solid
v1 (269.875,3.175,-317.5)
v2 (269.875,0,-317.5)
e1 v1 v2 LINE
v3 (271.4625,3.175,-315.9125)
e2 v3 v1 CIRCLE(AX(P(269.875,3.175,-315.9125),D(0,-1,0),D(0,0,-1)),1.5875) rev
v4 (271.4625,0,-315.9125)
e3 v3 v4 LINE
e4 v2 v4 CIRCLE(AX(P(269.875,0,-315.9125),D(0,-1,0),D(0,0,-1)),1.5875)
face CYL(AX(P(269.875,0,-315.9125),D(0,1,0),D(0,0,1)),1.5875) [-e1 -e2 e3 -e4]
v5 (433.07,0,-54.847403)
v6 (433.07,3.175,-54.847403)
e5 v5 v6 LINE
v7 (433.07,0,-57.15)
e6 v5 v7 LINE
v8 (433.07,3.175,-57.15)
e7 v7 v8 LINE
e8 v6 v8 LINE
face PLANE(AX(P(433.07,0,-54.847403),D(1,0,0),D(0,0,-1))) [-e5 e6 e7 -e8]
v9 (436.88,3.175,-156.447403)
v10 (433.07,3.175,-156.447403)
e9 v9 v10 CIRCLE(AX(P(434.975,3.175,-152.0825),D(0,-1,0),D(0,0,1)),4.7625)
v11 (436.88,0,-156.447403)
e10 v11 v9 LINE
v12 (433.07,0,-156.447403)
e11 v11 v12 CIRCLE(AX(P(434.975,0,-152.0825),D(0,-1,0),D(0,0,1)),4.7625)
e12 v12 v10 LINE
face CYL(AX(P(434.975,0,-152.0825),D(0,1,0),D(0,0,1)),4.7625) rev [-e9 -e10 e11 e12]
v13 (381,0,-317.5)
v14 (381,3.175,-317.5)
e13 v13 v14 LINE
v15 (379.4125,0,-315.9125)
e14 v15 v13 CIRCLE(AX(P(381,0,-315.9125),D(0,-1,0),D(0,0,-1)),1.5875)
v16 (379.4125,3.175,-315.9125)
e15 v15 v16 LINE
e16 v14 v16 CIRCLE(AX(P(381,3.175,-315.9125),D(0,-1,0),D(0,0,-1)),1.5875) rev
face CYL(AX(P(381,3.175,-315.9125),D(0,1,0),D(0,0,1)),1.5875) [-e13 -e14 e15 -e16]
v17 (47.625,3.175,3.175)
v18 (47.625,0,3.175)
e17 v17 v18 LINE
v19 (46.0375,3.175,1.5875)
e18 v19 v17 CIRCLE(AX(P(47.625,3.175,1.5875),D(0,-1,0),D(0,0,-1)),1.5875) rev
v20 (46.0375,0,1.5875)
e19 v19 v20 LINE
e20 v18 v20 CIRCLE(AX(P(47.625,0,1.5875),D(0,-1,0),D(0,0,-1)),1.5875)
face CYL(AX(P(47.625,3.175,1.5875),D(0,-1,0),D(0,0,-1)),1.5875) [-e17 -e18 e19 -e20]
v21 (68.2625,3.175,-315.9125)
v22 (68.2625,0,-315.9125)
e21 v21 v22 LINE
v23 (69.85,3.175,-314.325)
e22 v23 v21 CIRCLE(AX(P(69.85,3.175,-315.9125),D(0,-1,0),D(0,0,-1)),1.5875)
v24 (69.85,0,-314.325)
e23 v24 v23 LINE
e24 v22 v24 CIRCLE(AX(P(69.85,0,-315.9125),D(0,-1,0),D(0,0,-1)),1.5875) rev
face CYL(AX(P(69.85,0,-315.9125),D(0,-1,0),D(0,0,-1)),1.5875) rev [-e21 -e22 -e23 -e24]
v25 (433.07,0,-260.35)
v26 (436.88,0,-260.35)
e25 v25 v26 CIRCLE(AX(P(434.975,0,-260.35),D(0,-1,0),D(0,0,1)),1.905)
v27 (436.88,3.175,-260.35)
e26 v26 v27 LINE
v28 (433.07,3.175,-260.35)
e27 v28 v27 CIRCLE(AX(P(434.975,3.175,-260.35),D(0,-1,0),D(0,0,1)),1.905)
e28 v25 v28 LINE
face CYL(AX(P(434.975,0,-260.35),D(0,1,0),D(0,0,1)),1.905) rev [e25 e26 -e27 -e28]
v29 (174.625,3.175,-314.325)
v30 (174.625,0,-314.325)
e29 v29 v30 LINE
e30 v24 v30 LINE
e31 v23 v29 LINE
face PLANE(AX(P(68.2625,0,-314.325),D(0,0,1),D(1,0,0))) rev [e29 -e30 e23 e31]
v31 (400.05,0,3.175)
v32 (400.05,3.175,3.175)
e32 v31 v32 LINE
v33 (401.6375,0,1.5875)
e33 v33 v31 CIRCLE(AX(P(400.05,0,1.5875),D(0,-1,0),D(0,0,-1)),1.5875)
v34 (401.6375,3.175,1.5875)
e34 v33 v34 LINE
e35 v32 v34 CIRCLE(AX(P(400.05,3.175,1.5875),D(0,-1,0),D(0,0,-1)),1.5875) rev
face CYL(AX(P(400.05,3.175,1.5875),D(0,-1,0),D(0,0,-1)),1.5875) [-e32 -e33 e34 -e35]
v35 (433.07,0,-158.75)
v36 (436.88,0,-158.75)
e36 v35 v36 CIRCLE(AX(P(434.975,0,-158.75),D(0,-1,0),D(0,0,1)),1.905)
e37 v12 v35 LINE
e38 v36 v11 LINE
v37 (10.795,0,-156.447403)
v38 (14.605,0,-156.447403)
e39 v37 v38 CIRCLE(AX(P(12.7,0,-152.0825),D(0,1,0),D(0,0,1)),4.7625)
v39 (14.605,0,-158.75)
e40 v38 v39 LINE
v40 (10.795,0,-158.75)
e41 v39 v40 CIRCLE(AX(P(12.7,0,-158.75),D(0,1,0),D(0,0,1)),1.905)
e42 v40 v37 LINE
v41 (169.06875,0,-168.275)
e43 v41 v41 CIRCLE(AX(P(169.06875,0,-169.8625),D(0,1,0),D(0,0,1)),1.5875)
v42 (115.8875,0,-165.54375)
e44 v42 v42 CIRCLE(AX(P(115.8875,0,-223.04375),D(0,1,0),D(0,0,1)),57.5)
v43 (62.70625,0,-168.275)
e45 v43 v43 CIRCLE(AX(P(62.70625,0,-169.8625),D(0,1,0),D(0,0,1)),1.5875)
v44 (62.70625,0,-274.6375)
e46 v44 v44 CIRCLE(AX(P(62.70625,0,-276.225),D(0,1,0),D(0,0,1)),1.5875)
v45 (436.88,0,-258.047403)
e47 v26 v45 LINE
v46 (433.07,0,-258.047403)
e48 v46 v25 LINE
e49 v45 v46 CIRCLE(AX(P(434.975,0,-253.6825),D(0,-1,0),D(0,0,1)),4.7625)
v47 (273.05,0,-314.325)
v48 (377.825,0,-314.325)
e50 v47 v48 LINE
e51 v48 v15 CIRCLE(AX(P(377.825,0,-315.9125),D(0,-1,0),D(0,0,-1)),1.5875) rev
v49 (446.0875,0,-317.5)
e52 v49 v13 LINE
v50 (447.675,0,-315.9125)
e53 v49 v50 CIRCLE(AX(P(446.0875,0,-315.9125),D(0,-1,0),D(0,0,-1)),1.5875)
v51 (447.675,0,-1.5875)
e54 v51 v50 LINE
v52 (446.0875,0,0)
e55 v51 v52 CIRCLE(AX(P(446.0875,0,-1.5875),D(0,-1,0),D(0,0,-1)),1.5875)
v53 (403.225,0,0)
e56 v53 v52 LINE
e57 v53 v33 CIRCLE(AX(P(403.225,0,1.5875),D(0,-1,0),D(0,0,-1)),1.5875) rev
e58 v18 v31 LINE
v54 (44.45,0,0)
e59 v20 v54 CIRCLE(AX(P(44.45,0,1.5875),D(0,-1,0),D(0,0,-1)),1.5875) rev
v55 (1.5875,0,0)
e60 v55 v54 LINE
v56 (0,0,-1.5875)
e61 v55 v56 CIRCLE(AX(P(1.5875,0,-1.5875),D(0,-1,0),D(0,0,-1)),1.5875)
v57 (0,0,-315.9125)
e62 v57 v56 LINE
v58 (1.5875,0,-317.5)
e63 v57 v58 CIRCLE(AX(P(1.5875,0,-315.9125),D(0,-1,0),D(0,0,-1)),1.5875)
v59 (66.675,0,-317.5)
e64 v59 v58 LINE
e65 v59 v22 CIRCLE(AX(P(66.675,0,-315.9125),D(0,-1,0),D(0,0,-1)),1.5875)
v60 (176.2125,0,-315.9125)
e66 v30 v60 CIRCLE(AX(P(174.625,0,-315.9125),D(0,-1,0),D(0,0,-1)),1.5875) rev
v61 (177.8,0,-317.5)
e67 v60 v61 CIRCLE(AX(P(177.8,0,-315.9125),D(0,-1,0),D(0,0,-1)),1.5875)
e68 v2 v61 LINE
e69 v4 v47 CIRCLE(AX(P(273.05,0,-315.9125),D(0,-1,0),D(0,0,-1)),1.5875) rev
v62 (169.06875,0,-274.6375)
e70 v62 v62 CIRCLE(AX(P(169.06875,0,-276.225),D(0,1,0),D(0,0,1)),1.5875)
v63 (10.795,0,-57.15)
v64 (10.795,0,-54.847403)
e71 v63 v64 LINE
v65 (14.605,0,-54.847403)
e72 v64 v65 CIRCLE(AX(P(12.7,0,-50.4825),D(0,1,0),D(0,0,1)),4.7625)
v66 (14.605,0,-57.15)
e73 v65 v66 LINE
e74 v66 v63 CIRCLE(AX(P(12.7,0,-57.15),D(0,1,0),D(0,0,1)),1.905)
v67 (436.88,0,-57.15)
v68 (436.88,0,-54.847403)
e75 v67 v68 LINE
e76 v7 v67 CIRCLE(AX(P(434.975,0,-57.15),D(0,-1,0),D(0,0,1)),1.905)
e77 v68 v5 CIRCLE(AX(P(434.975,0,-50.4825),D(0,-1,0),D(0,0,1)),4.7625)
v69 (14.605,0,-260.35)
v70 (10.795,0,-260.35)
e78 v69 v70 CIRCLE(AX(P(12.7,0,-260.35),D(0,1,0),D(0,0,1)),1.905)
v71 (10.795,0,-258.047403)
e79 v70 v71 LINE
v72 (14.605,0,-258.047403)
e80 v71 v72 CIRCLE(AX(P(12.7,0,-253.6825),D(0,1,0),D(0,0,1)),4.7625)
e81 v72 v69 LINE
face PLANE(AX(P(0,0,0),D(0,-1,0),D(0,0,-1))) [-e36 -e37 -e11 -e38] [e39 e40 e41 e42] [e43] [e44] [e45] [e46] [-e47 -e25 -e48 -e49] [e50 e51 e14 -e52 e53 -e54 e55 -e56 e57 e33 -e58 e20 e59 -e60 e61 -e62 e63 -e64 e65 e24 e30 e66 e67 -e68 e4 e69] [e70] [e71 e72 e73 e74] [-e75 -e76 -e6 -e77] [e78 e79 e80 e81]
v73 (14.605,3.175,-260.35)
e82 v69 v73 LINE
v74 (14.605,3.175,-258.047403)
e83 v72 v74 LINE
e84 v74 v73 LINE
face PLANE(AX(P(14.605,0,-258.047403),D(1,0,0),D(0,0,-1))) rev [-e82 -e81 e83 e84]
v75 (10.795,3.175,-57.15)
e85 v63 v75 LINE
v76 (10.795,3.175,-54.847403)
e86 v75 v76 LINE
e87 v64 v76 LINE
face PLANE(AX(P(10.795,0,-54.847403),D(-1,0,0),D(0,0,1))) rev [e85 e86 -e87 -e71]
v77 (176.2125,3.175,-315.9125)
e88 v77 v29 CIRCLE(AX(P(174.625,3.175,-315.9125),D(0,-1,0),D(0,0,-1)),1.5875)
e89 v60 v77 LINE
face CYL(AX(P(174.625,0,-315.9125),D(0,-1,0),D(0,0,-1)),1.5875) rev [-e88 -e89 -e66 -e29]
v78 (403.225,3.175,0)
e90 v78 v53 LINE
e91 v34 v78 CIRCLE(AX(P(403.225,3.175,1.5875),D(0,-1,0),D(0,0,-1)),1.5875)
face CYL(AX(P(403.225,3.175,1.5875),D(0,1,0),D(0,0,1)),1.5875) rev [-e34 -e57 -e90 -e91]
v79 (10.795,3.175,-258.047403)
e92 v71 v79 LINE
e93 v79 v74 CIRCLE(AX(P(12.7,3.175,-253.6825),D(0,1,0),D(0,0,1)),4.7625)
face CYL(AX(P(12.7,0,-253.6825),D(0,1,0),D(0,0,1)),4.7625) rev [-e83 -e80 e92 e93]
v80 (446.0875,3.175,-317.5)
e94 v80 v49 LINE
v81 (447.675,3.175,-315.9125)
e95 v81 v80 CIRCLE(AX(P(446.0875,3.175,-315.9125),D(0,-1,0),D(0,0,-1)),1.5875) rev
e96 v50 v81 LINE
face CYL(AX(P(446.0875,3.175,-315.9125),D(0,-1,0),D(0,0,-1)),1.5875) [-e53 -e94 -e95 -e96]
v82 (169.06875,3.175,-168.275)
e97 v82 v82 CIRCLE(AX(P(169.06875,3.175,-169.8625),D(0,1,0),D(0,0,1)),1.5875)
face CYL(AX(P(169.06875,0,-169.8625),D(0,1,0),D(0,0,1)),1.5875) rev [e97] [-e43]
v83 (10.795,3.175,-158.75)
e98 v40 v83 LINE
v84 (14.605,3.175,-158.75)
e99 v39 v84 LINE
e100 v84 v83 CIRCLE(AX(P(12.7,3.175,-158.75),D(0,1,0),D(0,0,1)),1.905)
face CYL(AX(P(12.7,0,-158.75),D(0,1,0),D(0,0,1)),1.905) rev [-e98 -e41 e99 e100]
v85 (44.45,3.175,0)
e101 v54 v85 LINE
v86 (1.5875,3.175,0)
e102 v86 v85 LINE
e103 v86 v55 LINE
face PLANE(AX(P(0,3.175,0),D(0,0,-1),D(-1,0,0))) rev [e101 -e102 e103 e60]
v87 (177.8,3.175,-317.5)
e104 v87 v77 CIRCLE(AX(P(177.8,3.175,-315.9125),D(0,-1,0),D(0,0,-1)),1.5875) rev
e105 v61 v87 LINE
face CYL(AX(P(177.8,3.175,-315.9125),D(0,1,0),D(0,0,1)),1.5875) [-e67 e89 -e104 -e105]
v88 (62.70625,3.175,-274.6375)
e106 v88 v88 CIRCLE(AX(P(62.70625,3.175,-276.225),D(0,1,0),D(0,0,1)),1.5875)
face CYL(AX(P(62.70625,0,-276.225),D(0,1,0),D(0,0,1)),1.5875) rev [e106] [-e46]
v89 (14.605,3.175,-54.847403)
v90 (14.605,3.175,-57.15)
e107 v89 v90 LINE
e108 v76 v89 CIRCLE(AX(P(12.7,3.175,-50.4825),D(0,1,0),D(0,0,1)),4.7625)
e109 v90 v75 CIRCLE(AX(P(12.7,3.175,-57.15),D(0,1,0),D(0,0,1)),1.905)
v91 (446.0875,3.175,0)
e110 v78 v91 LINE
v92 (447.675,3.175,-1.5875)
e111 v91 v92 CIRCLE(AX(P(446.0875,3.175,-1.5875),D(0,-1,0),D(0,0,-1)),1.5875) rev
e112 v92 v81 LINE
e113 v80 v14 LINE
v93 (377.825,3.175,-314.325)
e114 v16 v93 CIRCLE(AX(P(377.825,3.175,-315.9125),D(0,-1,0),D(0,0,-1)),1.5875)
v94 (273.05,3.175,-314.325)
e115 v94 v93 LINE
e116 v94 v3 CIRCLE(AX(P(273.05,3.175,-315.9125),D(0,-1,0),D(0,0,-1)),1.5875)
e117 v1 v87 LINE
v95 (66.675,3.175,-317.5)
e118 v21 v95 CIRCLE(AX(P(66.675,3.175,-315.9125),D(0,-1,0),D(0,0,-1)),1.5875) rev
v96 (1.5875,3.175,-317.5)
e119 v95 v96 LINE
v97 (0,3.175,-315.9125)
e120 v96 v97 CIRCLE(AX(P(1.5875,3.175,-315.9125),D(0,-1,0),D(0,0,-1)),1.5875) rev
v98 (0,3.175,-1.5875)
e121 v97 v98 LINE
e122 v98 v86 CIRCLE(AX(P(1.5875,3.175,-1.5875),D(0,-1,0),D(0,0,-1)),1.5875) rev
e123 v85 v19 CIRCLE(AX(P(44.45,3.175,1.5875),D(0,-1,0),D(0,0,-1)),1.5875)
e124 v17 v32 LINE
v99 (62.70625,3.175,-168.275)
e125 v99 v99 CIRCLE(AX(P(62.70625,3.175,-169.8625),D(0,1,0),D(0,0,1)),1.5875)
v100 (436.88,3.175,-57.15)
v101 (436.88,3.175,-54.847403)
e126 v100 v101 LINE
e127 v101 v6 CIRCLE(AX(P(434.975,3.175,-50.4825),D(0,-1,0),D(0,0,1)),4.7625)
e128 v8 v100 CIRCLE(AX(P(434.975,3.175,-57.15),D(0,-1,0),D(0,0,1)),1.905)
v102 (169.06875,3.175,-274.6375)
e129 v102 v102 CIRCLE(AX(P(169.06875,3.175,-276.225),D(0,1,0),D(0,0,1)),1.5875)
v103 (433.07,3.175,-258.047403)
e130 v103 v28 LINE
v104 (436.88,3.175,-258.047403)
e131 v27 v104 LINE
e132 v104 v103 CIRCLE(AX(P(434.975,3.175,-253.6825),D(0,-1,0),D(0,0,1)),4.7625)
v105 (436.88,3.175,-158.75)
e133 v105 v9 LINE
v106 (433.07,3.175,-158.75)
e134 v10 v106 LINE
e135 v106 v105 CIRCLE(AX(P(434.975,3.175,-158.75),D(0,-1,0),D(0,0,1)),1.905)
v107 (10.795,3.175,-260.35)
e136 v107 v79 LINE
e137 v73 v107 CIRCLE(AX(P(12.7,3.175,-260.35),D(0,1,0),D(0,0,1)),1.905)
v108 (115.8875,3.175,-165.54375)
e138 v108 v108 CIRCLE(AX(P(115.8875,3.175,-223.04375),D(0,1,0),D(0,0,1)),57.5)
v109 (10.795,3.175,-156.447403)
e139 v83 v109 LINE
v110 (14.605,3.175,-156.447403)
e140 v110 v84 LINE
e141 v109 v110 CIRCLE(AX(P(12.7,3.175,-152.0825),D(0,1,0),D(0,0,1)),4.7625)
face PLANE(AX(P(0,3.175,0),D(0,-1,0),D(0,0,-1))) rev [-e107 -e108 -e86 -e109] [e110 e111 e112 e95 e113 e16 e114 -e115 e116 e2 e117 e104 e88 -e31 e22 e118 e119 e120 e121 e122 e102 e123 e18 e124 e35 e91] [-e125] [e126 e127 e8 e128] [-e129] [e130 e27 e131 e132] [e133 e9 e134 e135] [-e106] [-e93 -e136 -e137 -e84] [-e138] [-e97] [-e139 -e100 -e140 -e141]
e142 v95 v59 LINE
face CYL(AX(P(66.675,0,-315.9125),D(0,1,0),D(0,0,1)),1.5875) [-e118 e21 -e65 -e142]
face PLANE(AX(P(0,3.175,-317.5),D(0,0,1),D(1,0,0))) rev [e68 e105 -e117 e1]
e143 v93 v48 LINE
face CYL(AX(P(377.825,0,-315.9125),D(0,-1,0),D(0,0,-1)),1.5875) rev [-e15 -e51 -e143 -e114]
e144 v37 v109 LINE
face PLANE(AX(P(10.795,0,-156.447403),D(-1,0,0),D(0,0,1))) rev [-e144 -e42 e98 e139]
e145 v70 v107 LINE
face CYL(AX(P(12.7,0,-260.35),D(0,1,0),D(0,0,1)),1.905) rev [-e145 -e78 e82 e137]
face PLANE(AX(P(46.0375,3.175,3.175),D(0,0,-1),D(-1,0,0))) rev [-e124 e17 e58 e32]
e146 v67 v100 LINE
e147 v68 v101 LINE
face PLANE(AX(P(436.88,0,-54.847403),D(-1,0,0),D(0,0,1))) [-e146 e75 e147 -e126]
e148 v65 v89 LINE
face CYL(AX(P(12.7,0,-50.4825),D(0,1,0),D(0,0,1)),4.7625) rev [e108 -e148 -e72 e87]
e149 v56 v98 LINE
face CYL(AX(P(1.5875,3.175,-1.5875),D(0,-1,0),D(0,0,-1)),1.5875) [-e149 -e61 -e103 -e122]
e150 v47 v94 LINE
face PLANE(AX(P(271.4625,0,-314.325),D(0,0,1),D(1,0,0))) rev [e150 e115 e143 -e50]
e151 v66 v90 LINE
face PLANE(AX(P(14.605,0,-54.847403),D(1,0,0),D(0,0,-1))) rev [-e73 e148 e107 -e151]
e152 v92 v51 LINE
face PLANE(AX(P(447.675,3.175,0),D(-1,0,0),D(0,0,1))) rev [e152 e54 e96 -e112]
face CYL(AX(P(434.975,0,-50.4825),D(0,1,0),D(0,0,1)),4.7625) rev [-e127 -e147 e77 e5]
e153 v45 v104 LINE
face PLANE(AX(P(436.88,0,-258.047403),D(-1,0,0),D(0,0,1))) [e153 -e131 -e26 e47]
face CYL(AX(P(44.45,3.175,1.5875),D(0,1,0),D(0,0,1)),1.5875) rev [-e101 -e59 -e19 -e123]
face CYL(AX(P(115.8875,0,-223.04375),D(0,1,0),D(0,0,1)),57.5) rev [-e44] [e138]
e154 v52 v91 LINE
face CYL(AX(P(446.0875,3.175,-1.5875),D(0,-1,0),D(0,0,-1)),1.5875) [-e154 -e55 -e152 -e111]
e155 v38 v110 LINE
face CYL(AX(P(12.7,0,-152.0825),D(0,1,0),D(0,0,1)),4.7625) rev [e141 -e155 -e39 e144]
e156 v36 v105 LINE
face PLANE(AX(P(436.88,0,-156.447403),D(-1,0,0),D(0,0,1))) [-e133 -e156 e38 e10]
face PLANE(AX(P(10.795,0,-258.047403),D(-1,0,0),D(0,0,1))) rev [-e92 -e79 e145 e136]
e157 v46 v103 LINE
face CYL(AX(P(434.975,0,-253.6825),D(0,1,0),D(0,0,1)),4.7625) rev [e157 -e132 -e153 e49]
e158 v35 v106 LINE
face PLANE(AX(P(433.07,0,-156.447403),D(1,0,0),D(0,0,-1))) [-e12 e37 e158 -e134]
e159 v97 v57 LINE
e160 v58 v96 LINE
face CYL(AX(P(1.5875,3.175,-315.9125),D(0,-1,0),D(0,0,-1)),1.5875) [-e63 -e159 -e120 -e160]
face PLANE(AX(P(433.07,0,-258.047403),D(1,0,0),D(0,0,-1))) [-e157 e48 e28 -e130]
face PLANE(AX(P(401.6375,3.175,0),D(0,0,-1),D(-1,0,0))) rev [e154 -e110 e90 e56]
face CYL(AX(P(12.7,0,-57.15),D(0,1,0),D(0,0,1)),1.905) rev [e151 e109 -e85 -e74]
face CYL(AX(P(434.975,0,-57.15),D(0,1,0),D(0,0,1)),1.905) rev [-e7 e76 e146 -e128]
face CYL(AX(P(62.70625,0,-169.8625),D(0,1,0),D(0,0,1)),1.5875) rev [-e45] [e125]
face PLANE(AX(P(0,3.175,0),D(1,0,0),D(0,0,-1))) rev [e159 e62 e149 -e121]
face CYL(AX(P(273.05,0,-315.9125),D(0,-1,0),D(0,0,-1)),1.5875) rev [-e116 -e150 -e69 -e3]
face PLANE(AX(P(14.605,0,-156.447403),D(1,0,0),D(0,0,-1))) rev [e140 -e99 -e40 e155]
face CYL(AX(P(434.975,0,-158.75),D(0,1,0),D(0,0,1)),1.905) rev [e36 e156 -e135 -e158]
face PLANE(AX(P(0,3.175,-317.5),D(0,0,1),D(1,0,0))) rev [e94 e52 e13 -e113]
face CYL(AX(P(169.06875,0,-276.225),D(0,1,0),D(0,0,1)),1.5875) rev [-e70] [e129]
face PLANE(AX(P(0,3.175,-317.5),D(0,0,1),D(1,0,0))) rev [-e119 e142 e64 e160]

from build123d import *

# Parameters (mm, degrees)
BOSS_EXTRUDE1_DEPTH  = 3.175
SKETCH3_W            = 107.95
SKETCH3_H            = 3.175
CUT_EXTRUDE2_DEPTH   = 549.843544419
FILLET1_R            = 1.5875
CUT_EXTRUDE1_DEPTH   = 549.843544419
LPATTERN1_COUNT      = 3
LPATTERN1_PITCH      = 101.6
MIRROR1_COPY_1_DEPTH = 549.843544419
MIRROR1_COPY_2_DEPTH = 549.843544419
SKETCH4_R            = 1.5875
SKETCH4_R_2          = 57.5
CUT_EXTRUDE3_DEPTH   = 549.843544419


with BuildPart() as part:
    # Sketch1 → Boss-Extrude1 (new body)
    with BuildSketch(Plane(origin=(0, 0, 0), x_dir=(1, 0, 0), z_dir=(0, 1, 0))):
        Polygon((401.6375, 0), (447.675, 0), (447.675, 317.5), (0, 317.5), (0, 0), (46.0375, 0), (46.0375, -3.175), (401.6375, -3.175), align=None)
    extrude(amount=BOSS_EXTRUDE1_DEPTH)

    # Sketch3 → Cut-Extrude2 (cut, through all)
    with BuildSketch(Plane(origin=(0, 3.175, 0), x_dir=(1, 0, 0), z_dir=(0, 1, 0))):
        with Locations((122.2375, 315.9125)):
            Rectangle(SKETCH3_W, SKETCH3_H)
        with Locations((325.4375, 315.9125)):
            Rectangle(SKETCH3_W, SKETCH3_H)
    extrude(amount=-CUT_EXTRUDE2_DEPTH, mode=Mode.SUBTRACT)

    # Fillet1
    fillet1_edges = [part.edges().sort_by_distance(p)[0] for p in [
        (379.4125, 1.5875, -317.5),
        (271.4625, 1.5875, -317.5),
        (176.2125, 1.5875, -317.5),
        (68.2625, 1.5875, -317.5),
        (379.4125, 1.5875, -314.325),
        (271.4625, 1.5875, -314.325),
        (176.2125, 1.5875, -314.325),
        (68.2625, 1.5875, -314.325),
        (447.675, 1.5875, -317.5),
        (447.675, 1.5875, 0),
        (0, 1.5875, 0),
        (0, 1.5875, -317.5),
        (401.6375, 1.5875, 3.175),
        (401.6375, 1.5875, 0),
        (46.0375, 1.5875, 3.175),
        (46.0375, 1.5875, 0),
    ]]
    fillet(fillet1_edges, radius=FILLET1_R - 0.0001)  # a hair under: the kernel refuses the full size

    # Sketch2 → Cut-Extrude1 (cut, through all)
    with BuildSketch(Plane(origin=(0, 3.175, 0), x_dir=(1, 0, 0), z_dir=(0, 1, 0))):
        with BuildLine():
            Line((10.795, 258.047403349), (10.795, 260.35))
            ThreePointArc((10.795, 260.35), (12.7, 262.255), (14.605, 260.35))
            Line((14.605, 260.35), (14.605, 258.047403349))
            ThreePointArc((14.605, 258.047403349), (12.7, 248.92), (10.795, 258.047403349))
        make_face()
    cut_extrude1 = extrude(amount=-CUT_EXTRUDE1_DEPTH, mode=Mode.SUBTRACT)

    # LPattern1: Cut-Extrude1 ×3
    with Locations(*[(0, 0, i * LPATTERN1_PITCH) for i in range(1, LPATTERN1_COUNT)]):
        add(cut_extrude1, mode=Mode.SUBTRACT)

    # Mirror1: Cut-Extrude1 across plane
    add(cut_extrude1.mirror(Plane.ZY.offset(-223.8375)), mode=Mode.SUBTRACT)

    # Mirror1 copy 1 sketch → Mirror1 copy 1 (cut, through all)
    with BuildSketch(Plane(origin=(447.675, 3.175, 101.6), x_dir=(-1, 0, 0), z_dir=(0, 1, 0))):
        with BuildLine():
            Line((10.795, -258.047403349), (10.795, -260.35))
            ThreePointArc((10.795, -260.35), (12.7, -262.255), (14.605, -260.35))
            Line((14.605, -260.35), (14.605, -258.047403349))
            ThreePointArc((14.605, -258.047403349), (12.7, -248.92), (10.795, -258.047403349))
        make_face()
    extrude(amount=-MIRROR1_COPY_1_DEPTH, mode=Mode.SUBTRACT)

    # Mirror1 copy 2 sketch → Mirror1 copy 2 (cut, through all)
    with BuildSketch(Plane(origin=(447.675, 3.175, 203.2), x_dir=(-1, 0, 0), z_dir=(0, 1, 0))):
        with BuildLine():
            Line((10.795, -258.047403349), (10.795, -260.35))
            ThreePointArc((10.795, -260.35), (12.7, -262.255), (14.605, -260.35))
            Line((14.605, -260.35), (14.605, -258.047403349))
            ThreePointArc((14.605, -258.047403349), (12.7, -248.92), (10.795, -258.047403349))
        make_face()
    extrude(amount=-MIRROR1_COPY_2_DEPTH, mode=Mode.SUBTRACT)

    # Sketch4 → Cut-Extrude3 (cut, through all)
    with BuildSketch(Plane(origin=(0, 3.175, 0), x_dir=(1, 0, 0), z_dir=(0, 1, 0))):
        with Locations(Location((62.70625, 276.225, 0), (0, 0, 270))):
            Circle(SKETCH4_R)
        with Locations(Location((169.06875, 276.225, 0), (0, 0, 270))):
            Circle(SKETCH4_R)
        with Locations(Location((169.06875, 169.8625, 0), (0, 0, 270))):
            Circle(SKETCH4_R)
        with Locations(Location((62.70625, 169.8625, 0), (0, 0, 270))):
            Circle(SKETCH4_R)
        with Locations(Location((115.8875, 223.04375, 0), (0, 0, 270))):
            Circle(SKETCH4_R_2)
    extrude(amount=-CUT_EXTRUDE3_DEPTH, mode=Mode.SUBTRACT)


solid = part.part
